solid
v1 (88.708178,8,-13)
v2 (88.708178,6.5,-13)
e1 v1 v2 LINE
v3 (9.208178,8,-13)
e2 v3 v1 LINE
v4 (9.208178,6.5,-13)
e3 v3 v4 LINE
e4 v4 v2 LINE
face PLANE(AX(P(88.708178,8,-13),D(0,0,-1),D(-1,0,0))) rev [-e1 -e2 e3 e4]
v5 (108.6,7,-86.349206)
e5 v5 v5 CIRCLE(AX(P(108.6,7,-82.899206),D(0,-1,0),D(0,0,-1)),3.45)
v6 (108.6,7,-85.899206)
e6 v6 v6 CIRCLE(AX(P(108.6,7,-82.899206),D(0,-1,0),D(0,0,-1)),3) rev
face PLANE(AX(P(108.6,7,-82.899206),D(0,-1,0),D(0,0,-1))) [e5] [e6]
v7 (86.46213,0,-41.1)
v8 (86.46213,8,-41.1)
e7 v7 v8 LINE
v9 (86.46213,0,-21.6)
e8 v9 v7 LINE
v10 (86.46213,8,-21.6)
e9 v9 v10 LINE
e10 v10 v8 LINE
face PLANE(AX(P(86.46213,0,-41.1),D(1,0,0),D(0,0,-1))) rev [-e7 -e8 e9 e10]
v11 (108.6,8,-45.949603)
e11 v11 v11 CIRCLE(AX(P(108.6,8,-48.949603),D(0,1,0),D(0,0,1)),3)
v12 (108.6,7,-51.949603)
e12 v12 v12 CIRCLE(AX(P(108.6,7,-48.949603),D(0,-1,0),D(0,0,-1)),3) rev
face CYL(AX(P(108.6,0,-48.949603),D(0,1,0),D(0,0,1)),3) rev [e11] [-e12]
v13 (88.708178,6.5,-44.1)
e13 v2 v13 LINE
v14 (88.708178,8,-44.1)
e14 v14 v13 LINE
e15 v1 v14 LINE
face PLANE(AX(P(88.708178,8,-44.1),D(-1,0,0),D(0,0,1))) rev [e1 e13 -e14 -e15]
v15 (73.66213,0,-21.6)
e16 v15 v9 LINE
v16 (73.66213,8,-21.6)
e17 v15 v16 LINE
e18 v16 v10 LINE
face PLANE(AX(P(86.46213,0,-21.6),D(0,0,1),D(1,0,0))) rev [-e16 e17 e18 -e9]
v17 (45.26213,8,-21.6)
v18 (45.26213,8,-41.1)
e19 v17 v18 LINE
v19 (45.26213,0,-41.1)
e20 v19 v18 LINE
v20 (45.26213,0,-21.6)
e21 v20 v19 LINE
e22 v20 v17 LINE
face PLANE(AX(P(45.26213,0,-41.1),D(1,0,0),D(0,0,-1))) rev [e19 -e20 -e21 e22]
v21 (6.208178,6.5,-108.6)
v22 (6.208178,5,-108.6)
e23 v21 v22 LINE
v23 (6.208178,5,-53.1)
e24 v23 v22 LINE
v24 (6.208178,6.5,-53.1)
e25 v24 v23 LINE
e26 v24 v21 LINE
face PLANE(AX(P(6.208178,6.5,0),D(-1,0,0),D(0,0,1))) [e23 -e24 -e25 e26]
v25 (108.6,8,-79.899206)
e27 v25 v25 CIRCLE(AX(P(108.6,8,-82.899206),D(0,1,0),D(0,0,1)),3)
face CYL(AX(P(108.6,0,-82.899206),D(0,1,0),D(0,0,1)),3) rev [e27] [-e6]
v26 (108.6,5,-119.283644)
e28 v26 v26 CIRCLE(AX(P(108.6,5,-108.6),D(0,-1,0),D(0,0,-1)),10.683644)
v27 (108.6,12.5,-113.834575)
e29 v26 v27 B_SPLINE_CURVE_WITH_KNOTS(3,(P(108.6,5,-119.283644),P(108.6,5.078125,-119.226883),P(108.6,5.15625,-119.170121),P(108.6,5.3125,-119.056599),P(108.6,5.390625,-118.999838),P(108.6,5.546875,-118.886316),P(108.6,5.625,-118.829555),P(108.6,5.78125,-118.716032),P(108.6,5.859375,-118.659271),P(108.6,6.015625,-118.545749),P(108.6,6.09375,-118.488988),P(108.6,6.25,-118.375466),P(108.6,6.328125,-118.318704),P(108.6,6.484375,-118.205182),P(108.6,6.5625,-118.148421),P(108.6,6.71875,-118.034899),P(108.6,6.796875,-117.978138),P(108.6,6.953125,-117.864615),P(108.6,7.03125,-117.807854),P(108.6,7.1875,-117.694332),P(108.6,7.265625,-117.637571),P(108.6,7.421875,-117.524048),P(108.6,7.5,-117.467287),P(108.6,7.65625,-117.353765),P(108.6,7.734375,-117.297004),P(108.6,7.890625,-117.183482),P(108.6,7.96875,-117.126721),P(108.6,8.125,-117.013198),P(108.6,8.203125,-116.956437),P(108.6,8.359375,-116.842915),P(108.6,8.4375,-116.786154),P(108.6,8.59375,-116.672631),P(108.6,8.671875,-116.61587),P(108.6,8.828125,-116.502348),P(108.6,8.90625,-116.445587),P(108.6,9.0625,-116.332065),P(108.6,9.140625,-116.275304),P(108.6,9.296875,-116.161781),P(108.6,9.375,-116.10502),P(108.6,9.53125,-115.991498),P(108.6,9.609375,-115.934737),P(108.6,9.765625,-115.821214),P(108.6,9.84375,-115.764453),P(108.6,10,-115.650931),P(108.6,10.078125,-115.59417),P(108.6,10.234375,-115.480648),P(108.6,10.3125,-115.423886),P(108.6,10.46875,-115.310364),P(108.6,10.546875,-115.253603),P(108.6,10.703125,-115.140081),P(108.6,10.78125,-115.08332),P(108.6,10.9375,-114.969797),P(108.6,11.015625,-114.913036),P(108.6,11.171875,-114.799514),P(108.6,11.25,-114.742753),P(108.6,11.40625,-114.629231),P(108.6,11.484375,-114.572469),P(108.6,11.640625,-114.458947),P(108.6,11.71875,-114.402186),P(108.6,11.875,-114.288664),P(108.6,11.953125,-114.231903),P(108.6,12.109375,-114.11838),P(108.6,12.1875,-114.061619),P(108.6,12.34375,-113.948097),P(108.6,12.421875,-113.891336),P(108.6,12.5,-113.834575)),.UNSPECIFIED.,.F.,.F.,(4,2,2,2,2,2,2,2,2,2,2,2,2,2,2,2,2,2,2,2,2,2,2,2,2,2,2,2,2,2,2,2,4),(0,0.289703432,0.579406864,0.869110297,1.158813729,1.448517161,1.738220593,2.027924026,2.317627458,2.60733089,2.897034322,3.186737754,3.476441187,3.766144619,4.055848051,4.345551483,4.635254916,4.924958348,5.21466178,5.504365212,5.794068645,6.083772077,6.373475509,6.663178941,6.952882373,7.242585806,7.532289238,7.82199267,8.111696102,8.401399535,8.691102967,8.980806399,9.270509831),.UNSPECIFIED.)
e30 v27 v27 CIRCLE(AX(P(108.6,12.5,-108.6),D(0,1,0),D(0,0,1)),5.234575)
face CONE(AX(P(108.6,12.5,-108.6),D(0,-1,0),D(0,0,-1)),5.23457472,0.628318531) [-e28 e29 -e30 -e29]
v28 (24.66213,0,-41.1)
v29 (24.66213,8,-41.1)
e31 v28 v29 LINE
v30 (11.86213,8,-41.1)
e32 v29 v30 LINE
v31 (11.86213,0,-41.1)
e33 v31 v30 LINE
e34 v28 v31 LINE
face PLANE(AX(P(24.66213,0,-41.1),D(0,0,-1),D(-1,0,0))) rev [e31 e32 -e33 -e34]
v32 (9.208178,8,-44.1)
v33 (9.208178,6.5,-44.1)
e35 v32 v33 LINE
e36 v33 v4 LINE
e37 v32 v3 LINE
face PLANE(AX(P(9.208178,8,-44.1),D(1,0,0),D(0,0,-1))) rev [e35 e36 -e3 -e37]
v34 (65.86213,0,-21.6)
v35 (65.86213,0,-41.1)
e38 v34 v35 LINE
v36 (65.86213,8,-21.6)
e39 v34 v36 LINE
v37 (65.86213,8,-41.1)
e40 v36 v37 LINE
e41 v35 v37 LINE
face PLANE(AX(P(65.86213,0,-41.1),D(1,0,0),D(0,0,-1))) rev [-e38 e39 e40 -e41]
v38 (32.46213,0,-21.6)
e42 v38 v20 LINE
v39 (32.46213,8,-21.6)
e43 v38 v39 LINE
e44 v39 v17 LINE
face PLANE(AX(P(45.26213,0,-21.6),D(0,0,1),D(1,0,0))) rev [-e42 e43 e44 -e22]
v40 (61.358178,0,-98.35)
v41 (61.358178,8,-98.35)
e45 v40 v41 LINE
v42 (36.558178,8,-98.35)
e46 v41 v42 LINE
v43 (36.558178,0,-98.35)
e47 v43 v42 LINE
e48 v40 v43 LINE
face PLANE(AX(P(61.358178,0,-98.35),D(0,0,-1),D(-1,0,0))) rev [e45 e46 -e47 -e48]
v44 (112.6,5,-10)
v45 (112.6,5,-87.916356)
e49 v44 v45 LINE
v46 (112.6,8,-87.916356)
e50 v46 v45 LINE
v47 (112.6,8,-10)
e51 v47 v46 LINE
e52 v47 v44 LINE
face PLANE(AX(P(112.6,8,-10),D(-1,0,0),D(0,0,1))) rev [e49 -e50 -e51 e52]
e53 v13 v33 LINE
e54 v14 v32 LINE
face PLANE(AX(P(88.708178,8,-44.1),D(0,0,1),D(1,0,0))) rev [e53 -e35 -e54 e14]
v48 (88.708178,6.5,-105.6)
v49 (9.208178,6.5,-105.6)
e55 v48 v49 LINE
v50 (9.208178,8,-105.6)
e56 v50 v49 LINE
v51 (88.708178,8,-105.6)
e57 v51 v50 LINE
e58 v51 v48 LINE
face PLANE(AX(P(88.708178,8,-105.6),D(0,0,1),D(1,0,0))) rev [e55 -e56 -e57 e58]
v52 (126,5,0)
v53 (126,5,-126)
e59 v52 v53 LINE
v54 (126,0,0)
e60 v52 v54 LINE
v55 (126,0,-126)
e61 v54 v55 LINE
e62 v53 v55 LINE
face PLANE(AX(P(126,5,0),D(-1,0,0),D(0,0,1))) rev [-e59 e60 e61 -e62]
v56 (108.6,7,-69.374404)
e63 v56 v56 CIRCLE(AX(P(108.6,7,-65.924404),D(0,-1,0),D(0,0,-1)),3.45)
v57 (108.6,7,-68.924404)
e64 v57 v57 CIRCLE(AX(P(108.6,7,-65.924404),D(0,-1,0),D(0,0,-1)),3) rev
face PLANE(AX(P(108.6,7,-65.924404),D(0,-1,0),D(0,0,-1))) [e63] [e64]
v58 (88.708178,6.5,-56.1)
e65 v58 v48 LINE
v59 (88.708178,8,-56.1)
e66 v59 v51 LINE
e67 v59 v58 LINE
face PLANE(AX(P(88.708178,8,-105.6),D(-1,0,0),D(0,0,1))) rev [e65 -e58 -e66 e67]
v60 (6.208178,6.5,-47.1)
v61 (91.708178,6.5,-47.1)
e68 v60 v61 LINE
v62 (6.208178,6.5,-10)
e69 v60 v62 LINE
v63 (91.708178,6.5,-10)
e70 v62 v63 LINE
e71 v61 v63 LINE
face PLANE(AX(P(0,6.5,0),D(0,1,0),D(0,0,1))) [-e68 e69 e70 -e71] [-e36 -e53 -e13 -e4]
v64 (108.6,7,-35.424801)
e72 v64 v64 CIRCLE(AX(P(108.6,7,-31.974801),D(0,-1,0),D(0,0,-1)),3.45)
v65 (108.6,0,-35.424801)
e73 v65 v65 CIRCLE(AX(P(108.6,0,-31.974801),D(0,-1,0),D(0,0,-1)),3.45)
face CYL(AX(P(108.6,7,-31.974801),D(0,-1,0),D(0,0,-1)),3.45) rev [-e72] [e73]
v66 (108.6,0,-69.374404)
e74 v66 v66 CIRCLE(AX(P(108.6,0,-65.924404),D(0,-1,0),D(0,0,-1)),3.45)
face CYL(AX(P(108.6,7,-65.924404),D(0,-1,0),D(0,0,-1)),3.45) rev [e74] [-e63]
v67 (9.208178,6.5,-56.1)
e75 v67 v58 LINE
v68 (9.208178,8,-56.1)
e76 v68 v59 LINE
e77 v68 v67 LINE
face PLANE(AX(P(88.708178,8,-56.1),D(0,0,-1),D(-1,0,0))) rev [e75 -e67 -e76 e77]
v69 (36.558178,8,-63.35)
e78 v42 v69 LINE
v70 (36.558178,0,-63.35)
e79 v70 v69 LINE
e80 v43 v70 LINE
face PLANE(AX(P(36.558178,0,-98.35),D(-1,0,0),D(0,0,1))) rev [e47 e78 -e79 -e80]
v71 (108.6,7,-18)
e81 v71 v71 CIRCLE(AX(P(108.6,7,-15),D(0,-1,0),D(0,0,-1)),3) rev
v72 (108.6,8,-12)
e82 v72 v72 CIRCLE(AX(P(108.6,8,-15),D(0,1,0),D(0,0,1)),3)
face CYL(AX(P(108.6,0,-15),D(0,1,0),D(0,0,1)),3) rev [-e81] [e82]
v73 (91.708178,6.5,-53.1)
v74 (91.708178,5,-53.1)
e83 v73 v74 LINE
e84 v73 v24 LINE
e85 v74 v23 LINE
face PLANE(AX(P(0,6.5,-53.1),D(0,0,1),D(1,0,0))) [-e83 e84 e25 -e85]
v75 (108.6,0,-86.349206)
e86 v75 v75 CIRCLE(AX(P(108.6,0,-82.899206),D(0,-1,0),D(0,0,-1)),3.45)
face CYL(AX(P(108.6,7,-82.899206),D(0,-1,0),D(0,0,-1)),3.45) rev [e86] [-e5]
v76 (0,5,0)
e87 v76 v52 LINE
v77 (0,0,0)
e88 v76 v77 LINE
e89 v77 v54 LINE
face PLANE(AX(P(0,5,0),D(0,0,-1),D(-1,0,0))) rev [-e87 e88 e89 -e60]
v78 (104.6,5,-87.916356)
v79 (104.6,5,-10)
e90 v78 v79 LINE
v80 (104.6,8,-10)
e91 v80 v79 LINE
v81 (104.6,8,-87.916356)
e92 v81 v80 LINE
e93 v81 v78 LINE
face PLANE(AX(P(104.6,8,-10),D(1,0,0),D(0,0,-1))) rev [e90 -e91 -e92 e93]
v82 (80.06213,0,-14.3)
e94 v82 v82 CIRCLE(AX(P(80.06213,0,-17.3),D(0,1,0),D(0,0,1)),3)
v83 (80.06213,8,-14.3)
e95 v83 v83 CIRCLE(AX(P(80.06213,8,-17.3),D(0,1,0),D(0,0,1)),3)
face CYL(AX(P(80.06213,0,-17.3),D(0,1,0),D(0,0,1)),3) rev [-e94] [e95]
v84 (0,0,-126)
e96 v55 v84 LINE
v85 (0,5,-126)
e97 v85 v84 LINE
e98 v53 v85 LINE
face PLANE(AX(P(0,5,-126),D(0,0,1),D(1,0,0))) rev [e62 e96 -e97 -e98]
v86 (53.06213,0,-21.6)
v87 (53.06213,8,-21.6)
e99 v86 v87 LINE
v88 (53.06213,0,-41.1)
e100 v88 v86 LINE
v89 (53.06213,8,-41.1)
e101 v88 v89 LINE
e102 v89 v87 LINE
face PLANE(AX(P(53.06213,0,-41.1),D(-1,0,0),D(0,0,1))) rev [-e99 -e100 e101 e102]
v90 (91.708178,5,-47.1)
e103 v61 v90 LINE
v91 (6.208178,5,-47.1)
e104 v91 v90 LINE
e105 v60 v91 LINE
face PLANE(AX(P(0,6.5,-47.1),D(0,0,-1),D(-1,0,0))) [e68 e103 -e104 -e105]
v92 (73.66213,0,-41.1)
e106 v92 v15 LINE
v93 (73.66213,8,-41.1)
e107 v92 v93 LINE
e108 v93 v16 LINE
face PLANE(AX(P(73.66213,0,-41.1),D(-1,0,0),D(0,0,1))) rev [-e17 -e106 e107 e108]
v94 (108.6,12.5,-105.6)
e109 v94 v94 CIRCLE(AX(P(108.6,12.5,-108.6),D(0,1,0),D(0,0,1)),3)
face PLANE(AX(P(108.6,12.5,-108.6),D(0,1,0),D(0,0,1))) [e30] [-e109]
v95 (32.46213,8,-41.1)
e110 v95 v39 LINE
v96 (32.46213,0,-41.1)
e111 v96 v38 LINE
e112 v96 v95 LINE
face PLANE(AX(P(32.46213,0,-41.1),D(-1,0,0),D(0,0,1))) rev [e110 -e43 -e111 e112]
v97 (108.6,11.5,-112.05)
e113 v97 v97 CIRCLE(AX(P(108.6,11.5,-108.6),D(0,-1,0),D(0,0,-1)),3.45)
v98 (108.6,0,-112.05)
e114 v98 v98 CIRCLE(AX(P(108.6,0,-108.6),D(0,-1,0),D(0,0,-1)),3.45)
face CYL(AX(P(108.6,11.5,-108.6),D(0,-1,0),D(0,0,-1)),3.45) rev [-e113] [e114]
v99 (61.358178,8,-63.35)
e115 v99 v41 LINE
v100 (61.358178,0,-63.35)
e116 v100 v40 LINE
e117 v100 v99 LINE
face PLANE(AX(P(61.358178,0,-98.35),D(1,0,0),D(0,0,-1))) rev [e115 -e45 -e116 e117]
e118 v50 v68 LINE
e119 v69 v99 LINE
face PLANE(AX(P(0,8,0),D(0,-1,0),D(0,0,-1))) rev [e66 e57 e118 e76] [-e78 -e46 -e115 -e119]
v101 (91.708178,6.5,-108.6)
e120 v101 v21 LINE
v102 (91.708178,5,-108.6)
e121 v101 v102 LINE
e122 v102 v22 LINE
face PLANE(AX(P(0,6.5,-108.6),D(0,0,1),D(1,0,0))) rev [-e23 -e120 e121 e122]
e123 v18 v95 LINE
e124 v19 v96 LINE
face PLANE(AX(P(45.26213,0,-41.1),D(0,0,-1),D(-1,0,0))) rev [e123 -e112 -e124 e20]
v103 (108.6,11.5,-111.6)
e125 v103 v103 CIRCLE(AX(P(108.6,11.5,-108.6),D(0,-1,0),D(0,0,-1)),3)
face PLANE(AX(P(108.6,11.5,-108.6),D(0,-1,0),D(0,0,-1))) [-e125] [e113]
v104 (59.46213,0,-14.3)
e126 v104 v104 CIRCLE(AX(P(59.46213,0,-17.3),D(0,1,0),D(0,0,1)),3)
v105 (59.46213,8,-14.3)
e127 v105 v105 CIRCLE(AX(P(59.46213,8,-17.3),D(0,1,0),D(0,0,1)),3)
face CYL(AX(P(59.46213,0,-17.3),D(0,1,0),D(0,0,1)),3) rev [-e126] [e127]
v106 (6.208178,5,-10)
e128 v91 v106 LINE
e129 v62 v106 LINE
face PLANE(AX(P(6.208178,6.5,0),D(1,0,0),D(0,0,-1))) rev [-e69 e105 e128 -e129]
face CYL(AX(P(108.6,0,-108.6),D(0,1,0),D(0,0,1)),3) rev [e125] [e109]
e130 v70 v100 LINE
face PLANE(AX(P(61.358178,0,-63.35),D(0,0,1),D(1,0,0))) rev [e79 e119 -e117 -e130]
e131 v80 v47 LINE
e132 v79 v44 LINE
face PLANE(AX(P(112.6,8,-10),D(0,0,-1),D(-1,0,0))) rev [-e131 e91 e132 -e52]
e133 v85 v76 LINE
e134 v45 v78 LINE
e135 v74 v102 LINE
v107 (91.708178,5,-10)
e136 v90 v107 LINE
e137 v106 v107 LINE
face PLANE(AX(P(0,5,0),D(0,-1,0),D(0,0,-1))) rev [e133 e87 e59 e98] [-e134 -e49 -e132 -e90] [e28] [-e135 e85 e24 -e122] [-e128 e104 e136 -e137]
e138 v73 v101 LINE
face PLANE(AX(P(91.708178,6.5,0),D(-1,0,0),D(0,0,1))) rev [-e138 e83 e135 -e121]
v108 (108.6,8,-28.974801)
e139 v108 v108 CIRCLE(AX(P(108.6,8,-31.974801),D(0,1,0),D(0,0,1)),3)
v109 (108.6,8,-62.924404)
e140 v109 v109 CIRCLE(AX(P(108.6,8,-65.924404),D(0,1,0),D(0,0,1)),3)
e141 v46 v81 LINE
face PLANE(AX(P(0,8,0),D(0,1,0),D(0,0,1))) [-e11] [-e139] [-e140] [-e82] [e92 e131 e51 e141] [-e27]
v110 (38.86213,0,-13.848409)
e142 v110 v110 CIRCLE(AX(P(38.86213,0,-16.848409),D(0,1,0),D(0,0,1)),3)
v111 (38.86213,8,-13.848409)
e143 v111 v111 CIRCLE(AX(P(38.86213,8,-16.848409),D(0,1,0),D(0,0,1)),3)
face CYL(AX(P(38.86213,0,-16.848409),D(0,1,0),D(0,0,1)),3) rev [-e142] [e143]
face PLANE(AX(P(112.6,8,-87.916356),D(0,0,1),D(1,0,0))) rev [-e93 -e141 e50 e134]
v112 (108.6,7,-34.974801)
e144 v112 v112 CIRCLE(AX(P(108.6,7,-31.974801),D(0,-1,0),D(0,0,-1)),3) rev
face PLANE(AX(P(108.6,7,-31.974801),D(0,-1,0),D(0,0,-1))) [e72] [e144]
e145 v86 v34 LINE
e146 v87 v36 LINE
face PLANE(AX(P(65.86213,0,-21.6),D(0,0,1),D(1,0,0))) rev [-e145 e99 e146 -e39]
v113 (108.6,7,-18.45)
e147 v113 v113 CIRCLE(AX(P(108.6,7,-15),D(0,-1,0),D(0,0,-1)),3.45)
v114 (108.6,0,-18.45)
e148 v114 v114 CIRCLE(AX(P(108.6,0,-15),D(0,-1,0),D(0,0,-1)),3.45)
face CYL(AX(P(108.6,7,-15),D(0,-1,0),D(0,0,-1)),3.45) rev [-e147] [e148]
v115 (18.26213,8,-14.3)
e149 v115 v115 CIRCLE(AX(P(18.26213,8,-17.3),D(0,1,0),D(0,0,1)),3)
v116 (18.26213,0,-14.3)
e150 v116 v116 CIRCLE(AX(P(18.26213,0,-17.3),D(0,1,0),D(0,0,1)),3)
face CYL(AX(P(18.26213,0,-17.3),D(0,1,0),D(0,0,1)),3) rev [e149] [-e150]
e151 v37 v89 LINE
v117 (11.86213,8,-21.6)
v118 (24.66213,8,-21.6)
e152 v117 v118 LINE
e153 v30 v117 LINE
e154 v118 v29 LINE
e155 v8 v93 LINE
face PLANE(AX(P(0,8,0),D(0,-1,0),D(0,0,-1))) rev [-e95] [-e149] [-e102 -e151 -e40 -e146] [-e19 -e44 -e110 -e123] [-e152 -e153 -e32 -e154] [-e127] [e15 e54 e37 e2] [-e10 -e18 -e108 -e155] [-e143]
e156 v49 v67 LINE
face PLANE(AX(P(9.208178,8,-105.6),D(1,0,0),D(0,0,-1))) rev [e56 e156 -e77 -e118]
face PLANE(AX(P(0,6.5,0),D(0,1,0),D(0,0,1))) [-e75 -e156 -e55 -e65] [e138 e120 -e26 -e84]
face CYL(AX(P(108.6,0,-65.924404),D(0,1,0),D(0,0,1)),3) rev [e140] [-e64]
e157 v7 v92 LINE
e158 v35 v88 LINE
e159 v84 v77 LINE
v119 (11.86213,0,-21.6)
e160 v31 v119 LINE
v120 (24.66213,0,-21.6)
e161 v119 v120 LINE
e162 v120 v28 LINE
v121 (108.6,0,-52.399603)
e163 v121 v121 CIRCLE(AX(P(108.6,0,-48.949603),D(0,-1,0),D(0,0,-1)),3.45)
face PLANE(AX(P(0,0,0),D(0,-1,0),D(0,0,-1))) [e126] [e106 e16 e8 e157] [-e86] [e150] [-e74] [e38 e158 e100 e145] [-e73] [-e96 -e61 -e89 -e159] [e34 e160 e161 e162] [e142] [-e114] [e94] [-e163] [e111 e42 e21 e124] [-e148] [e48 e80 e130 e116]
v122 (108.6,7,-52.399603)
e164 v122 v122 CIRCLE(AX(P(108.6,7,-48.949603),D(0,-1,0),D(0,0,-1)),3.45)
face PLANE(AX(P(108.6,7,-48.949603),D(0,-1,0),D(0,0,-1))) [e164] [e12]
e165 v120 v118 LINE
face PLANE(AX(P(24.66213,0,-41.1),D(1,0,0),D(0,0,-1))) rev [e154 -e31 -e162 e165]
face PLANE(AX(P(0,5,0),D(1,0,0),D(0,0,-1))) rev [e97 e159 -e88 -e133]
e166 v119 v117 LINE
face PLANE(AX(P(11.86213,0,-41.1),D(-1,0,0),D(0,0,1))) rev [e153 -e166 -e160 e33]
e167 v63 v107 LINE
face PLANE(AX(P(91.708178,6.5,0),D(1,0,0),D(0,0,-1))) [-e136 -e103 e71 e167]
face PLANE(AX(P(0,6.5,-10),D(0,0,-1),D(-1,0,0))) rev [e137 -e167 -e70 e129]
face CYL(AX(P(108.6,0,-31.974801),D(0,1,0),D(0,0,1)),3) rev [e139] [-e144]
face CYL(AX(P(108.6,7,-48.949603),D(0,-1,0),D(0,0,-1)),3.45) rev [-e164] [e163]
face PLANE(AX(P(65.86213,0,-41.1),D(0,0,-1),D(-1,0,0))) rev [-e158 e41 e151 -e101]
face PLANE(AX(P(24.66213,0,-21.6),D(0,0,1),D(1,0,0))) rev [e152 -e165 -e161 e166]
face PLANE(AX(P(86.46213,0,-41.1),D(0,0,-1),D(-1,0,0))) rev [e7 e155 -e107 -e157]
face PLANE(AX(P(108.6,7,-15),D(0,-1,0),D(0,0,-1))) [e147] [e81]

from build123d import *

# Parameters (mm, degrees)
SKETCH1_W           = 126
SKETCH1_H           = 126
BOSS_EXTRUDE1_DEPTH = 5
SKETCH3_R           = 12.5
BOSS_EXTRUDE2_DEPTH = 7.5
SKETCH4_R           = 3.45
CUT_EXTRUDE1_DEPTH  = 11.5
SKETCH6_R           = 3
CUT_EXTRUDE2_DEPTH  = 179.628805068
CHAMFER1_SIZE       = 10
CHAMFER1_SIZE_2     = 7.26542528
SKETCH7_W           = 8
SKETCH7_H           = 77.91635632
BOSS_EXTRUDE3_DEPTH = 3
SKETCH8_R           = 3
CUT_EXTRUDE3_DEPTH  = 179.370401132
SKETCH9_R           = 3.45
CUT_EXTRUDE4_DEPTH  = 7
SKETCH10_W          = 85.5
SKETCH10_H          = 55.5
SKETCH10_H_2        = 37.1
SKETCH10_W_2        = 73.5
SKETCH10_H_3        = 19.1
SKETCH10_W_3        = 36.75
SKETCH10_H_4        = 9.55
BOSS_EXTRUDE5_DEPTH = 1.5
SKETCH12_W          = 79.5
SKETCH12_H          = 49.5
BOSS_EXTRUDE6_DEPTH = 1.5
SKETCH13_W          = 79.5
SKETCH13_H          = 31.1
BOSS_EXTRUDE7_DEPTH = 1.5
SKETCH14_W          = 24.8
SKETCH14_H          = 35
CUT_EXTRUDE5_DEPTH  = 179.370401132
SKETCH15_W          = 12.8
SKETCH15_H          = 19.5
CUT_EXTRUDE6_DEPTH  = 179.370401132
SKETCH16_R          = 3
CUT_EXTRUDE7_DEPTH  = 179.370401132


with BuildPart() as part:
    # Sketch1 → Boss-Extrude1 (new body)
    with BuildSketch(Plane(origin=(0, 0, 0), x_dir=(1, 0, 0), z_dir=(0, 1, 0))):
        with Locations((63, 63)):
            Rectangle(SKETCH1_W, SKETCH1_H)
    extrude(amount=BOSS_EXTRUDE1_DEPTH)

    # Sketch3 → Boss-Extrude2 (add)
    with BuildSketch(Plane(origin=(0, 5, 0), x_dir=(1, 0, 0), z_dir=(0, 1, 0))):
        with Locations(Location((108.6, 108.6, 0), (0, 0, 90))):
            Circle(SKETCH3_R)
    extrude(amount=BOSS_EXTRUDE2_DEPTH)

    # Sketch4 → Cut-Extrude1 (cut)
    with BuildSketch(Plane.XZ):
        with Locations(Location((108.6, -108.6, 0), (0, 0, 270))):
            Circle(SKETCH4_R)
    extrude(amount=-CUT_EXTRUDE1_DEPTH, mode=Mode.SUBTRACT)

    # Sketch6 → Cut-Extrude2 (cut, through all)
    with BuildSketch(Plane(origin=(0, 12.5, 0), x_dir=(1, 0, 0), z_dir=(0, 1, 0))):
        with Locations(Location((108.6, 108.6, 0), (0, 0, 270))):
            Circle(SKETCH6_R)
    extrude(amount=-CUT_EXTRUDE2_DEPTH, mode=Mode.SUBTRACT)

    # Chamfer1
    # the kernel refuses this chamfer: 10, 7.26542528 mm, written as the material it takes off along each edge
    with BuildSketch(Plane(origin=(108.6, 12.5, -108.6), x_dir=(0, 0, -1), z_dir=(1, 0, 0))) as chamfer1_piece_1_section:
        Polygon((12.5, -CHAMFER1_SIZE), (12.5 - CHAMFER1_SIZE_2, 0), (12.5, 0), align=None)
    chamfer1_piece_1 = revolve(axis=Axis((108.6, 12.5, -108.6), (0, 1, 0)), mode=Mode.PRIVATE)
    chamfer1_piece_1 = split(chamfer1_piece_1, bisect_by=Plane(origin=(108.6, 5, -100.650989912), z_dir=(0, 1, 0)), keep=Keep.TOP, mode=Mode.PRIVATE)
    add(chamfer1_piece_1, mode=Mode.SUBTRACT)

    # Sketch7 → Boss-Extrude3 (add)
    with BuildSketch(Plane(origin=(0, 5, 0), x_dir=(1, 0, 0), z_dir=(0, 1, 0))):
        with Locations((108.6, 48.95817816)):
            Rectangle(SKETCH7_W, SKETCH7_H)
    extrude(amount=BOSS_EXTRUDE3_DEPTH)

    # Sketch8 → Cut-Extrude3 (cut, through all)
    with BuildSketch(Plane(origin=(0, 8, 0), x_dir=(1, 0, 0), z_dir=(0, 1, 0))):
        with Locations(Location((108.6, 15, 0), (0, 0, 270))):
            Circle(SKETCH8_R)
        with Locations(Location((108.6, 31.974801407, 0), (0, 0, 270))):
            Circle(SKETCH8_R)
        with Locations(Location((108.6, 48.949602814, 0), (0, 0, 270))):
            Circle(SKETCH8_R)
        with Locations(Location((108.6, 65.924404221, 0), (0, 0, 270))):
            Circle(SKETCH8_R)
        with Locations(Location((108.6, 82.899205628, 0), (0, 0, 270))):
            Circle(SKETCH8_R)
    extrude(amount=-CUT_EXTRUDE3_DEPTH, mode=Mode.SUBTRACT)

    # Sketch9 → Cut-Extrude4 (cut)
    with BuildSketch(Plane.XZ):
        with Locations(Location((108.6, -82.899205628, 0), (0, 0, 270))):
            Circle(SKETCH9_R)
        with Locations(Location((108.6, -65.924404221, 0), (0, 0, 270))):
            Circle(SKETCH9_R)
        with Locations(Location((108.6, -48.949602814, 0), (0, 0, 270))):
            Circle(SKETCH9_R)
        with Locations(Location((108.6, -15, 0), (0, 0, 270))):
            Circle(SKETCH9_R)
        with Locations(Location((108.6, -31.974801407, 0), (0, 0, 270))):
            Circle(SKETCH9_R)
    extrude(amount=-CUT_EXTRUDE4_DEPTH, mode=Mode.SUBTRACT)

    # Sketch10 → Boss-Extrude5 (add)
    # profile 1 of 6: a face of its own
    with BuildSketch(Plane(origin=(0, 5, 0), x_dir=(1, 0, 0), z_dir=(0, 1, 0))):
        with Locations((48.95817816, 80.85)):
            Rectangle(SKETCH10_W, SKETCH10_H)
    # profile 2 of 6: a face of its own
    with BuildSketch(Plane(origin=(0, 5, 0), x_dir=(1, 0, 0), z_dir=(0, 1, 0))):
        with Locations((48.95817816, 28.55)):
            Rectangle(SKETCH10_W, SKETCH10_H_2)
        with Locations((48.95817816, 31.55)):
            Rectangle(SKETCH10_W_2, SKETCH10_H_3, mode=Mode.SUBTRACT)
    # profile 3 of 6: a face of its own
    with BuildSketch(Plane(origin=(0, 5, 0), x_dir=(1, 0, 0), z_dir=(0, 1, 0))):
        with Locations((30.58317816, 26.775)):
            Rectangle(SKETCH10_W_3, SKETCH10_H_4)
    # profile 4 of 6: a face of its own
    with BuildSketch(Plane(origin=(0, 5, 0), x_dir=(1, 0, 0), z_dir=(0, 1, 0))):
        with Locations((30.58317816, 36.325)):
            Rectangle(SKETCH10_W_3, SKETCH10_H_4)
    # profile 5 of 6: a face of its own
    with BuildSketch(Plane(origin=(0, 5, 0), x_dir=(1, 0, 0), z_dir=(0, 1, 0))):
        with Locations((67.33317816, 36.325)):
            Rectangle(SKETCH10_W_3, SKETCH10_H_4)
    # profile 6 of 6: a face of its own
    with BuildSketch(Plane(origin=(0, 5, 0), x_dir=(1, 0, 0), z_dir=(0, 1, 0))):
        with Locations((67.33317816, 26.775)):
            Rectangle(SKETCH10_W_3, SKETCH10_H_4)
    extrude(amount=BOSS_EXTRUDE5_DEPTH)

    # Sketch12 → Boss-Extrude6 (add)
    with BuildSketch(Plane(origin=(0, 6.5, 0), x_dir=(1, 0, 0), z_dir=(0, 1, 0))):
        with Locations((48.95817816, 80.85)):
            Rectangle(SKETCH12_W, SKETCH12_H)
    extrude(amount=BOSS_EXTRUDE6_DEPTH)

    # Sketch13 → Boss-Extrude7 (add)
    with BuildSketch(Plane(origin=(0, 6.5, 0), x_dir=(1, 0, 0), z_dir=(0, 1, 0))):
        with Locations((48.95817816, 28.55)):
            Rectangle(SKETCH13_W, SKETCH13_H)
    extrude(amount=BOSS_EXTRUDE7_DEPTH)

    # Sketch14 → Cut-Extrude5 (cut, through all)
    with BuildSketch(Plane(origin=(0, 8, 0), x_dir=(1, 0, 0), z_dir=(0, 1, 0))):
        with Locations((48.95817816, 80.85)):
            Rectangle(SKETCH14_W, SKETCH14_H)
    extrude(amount=-CUT_EXTRUDE5_DEPTH, mode=Mode.SUBTRACT)

    # Sketch15 → Cut-Extrude6 (cut, through all)
    with BuildSketch(Plane(origin=(0, 8, 0), x_dir=(1, 0, 0), z_dir=(0, 1, 0))):
        with Locations((38.862130436, 31.35)):
            Rectangle(SKETCH15_W, SKETCH15_H)
        with Locations((18.262130436, 31.35)):
            Rectangle(SKETCH15_W, SKETCH15_H)
        with Locations((59.462130436, 31.35)):
            Rectangle(SKETCH15_W, SKETCH15_H)
        with Locations((80.062130436, 31.35)):
            Rectangle(SKETCH15_W, SKETCH15_H)
    extrude(amount=-CUT_EXTRUDE6_DEPTH, mode=Mode.SUBTRACT)

    # Sketch16 → Cut-Extrude7 (cut, through all)
    with BuildSketch(Plane(origin=(0, 8, 0), x_dir=(1, 0, 0), z_dir=(0, 1, 0))):
        with Locations(Location((18.262130436, 17.3, 0), (0, 0, 270))):
            Circle(SKETCH16_R)
        with Locations(Location((38.862130436, 16.84840868, 0), (0, 0, 270))):
            Circle(SKETCH16_R)
        with Locations(Location((59.462130436, 17.3, 0), (0, 0, 270))):
            Circle(SKETCH16_R)
        with Locations(Location((80.062130436, 17.3, 0), (0, 0, 270))):
            Circle(SKETCH16_R)
    extrude(amount=-CUT_EXTRUDE7_DEPTH, mode=Mode.SUBTRACT)


solid = part.part
